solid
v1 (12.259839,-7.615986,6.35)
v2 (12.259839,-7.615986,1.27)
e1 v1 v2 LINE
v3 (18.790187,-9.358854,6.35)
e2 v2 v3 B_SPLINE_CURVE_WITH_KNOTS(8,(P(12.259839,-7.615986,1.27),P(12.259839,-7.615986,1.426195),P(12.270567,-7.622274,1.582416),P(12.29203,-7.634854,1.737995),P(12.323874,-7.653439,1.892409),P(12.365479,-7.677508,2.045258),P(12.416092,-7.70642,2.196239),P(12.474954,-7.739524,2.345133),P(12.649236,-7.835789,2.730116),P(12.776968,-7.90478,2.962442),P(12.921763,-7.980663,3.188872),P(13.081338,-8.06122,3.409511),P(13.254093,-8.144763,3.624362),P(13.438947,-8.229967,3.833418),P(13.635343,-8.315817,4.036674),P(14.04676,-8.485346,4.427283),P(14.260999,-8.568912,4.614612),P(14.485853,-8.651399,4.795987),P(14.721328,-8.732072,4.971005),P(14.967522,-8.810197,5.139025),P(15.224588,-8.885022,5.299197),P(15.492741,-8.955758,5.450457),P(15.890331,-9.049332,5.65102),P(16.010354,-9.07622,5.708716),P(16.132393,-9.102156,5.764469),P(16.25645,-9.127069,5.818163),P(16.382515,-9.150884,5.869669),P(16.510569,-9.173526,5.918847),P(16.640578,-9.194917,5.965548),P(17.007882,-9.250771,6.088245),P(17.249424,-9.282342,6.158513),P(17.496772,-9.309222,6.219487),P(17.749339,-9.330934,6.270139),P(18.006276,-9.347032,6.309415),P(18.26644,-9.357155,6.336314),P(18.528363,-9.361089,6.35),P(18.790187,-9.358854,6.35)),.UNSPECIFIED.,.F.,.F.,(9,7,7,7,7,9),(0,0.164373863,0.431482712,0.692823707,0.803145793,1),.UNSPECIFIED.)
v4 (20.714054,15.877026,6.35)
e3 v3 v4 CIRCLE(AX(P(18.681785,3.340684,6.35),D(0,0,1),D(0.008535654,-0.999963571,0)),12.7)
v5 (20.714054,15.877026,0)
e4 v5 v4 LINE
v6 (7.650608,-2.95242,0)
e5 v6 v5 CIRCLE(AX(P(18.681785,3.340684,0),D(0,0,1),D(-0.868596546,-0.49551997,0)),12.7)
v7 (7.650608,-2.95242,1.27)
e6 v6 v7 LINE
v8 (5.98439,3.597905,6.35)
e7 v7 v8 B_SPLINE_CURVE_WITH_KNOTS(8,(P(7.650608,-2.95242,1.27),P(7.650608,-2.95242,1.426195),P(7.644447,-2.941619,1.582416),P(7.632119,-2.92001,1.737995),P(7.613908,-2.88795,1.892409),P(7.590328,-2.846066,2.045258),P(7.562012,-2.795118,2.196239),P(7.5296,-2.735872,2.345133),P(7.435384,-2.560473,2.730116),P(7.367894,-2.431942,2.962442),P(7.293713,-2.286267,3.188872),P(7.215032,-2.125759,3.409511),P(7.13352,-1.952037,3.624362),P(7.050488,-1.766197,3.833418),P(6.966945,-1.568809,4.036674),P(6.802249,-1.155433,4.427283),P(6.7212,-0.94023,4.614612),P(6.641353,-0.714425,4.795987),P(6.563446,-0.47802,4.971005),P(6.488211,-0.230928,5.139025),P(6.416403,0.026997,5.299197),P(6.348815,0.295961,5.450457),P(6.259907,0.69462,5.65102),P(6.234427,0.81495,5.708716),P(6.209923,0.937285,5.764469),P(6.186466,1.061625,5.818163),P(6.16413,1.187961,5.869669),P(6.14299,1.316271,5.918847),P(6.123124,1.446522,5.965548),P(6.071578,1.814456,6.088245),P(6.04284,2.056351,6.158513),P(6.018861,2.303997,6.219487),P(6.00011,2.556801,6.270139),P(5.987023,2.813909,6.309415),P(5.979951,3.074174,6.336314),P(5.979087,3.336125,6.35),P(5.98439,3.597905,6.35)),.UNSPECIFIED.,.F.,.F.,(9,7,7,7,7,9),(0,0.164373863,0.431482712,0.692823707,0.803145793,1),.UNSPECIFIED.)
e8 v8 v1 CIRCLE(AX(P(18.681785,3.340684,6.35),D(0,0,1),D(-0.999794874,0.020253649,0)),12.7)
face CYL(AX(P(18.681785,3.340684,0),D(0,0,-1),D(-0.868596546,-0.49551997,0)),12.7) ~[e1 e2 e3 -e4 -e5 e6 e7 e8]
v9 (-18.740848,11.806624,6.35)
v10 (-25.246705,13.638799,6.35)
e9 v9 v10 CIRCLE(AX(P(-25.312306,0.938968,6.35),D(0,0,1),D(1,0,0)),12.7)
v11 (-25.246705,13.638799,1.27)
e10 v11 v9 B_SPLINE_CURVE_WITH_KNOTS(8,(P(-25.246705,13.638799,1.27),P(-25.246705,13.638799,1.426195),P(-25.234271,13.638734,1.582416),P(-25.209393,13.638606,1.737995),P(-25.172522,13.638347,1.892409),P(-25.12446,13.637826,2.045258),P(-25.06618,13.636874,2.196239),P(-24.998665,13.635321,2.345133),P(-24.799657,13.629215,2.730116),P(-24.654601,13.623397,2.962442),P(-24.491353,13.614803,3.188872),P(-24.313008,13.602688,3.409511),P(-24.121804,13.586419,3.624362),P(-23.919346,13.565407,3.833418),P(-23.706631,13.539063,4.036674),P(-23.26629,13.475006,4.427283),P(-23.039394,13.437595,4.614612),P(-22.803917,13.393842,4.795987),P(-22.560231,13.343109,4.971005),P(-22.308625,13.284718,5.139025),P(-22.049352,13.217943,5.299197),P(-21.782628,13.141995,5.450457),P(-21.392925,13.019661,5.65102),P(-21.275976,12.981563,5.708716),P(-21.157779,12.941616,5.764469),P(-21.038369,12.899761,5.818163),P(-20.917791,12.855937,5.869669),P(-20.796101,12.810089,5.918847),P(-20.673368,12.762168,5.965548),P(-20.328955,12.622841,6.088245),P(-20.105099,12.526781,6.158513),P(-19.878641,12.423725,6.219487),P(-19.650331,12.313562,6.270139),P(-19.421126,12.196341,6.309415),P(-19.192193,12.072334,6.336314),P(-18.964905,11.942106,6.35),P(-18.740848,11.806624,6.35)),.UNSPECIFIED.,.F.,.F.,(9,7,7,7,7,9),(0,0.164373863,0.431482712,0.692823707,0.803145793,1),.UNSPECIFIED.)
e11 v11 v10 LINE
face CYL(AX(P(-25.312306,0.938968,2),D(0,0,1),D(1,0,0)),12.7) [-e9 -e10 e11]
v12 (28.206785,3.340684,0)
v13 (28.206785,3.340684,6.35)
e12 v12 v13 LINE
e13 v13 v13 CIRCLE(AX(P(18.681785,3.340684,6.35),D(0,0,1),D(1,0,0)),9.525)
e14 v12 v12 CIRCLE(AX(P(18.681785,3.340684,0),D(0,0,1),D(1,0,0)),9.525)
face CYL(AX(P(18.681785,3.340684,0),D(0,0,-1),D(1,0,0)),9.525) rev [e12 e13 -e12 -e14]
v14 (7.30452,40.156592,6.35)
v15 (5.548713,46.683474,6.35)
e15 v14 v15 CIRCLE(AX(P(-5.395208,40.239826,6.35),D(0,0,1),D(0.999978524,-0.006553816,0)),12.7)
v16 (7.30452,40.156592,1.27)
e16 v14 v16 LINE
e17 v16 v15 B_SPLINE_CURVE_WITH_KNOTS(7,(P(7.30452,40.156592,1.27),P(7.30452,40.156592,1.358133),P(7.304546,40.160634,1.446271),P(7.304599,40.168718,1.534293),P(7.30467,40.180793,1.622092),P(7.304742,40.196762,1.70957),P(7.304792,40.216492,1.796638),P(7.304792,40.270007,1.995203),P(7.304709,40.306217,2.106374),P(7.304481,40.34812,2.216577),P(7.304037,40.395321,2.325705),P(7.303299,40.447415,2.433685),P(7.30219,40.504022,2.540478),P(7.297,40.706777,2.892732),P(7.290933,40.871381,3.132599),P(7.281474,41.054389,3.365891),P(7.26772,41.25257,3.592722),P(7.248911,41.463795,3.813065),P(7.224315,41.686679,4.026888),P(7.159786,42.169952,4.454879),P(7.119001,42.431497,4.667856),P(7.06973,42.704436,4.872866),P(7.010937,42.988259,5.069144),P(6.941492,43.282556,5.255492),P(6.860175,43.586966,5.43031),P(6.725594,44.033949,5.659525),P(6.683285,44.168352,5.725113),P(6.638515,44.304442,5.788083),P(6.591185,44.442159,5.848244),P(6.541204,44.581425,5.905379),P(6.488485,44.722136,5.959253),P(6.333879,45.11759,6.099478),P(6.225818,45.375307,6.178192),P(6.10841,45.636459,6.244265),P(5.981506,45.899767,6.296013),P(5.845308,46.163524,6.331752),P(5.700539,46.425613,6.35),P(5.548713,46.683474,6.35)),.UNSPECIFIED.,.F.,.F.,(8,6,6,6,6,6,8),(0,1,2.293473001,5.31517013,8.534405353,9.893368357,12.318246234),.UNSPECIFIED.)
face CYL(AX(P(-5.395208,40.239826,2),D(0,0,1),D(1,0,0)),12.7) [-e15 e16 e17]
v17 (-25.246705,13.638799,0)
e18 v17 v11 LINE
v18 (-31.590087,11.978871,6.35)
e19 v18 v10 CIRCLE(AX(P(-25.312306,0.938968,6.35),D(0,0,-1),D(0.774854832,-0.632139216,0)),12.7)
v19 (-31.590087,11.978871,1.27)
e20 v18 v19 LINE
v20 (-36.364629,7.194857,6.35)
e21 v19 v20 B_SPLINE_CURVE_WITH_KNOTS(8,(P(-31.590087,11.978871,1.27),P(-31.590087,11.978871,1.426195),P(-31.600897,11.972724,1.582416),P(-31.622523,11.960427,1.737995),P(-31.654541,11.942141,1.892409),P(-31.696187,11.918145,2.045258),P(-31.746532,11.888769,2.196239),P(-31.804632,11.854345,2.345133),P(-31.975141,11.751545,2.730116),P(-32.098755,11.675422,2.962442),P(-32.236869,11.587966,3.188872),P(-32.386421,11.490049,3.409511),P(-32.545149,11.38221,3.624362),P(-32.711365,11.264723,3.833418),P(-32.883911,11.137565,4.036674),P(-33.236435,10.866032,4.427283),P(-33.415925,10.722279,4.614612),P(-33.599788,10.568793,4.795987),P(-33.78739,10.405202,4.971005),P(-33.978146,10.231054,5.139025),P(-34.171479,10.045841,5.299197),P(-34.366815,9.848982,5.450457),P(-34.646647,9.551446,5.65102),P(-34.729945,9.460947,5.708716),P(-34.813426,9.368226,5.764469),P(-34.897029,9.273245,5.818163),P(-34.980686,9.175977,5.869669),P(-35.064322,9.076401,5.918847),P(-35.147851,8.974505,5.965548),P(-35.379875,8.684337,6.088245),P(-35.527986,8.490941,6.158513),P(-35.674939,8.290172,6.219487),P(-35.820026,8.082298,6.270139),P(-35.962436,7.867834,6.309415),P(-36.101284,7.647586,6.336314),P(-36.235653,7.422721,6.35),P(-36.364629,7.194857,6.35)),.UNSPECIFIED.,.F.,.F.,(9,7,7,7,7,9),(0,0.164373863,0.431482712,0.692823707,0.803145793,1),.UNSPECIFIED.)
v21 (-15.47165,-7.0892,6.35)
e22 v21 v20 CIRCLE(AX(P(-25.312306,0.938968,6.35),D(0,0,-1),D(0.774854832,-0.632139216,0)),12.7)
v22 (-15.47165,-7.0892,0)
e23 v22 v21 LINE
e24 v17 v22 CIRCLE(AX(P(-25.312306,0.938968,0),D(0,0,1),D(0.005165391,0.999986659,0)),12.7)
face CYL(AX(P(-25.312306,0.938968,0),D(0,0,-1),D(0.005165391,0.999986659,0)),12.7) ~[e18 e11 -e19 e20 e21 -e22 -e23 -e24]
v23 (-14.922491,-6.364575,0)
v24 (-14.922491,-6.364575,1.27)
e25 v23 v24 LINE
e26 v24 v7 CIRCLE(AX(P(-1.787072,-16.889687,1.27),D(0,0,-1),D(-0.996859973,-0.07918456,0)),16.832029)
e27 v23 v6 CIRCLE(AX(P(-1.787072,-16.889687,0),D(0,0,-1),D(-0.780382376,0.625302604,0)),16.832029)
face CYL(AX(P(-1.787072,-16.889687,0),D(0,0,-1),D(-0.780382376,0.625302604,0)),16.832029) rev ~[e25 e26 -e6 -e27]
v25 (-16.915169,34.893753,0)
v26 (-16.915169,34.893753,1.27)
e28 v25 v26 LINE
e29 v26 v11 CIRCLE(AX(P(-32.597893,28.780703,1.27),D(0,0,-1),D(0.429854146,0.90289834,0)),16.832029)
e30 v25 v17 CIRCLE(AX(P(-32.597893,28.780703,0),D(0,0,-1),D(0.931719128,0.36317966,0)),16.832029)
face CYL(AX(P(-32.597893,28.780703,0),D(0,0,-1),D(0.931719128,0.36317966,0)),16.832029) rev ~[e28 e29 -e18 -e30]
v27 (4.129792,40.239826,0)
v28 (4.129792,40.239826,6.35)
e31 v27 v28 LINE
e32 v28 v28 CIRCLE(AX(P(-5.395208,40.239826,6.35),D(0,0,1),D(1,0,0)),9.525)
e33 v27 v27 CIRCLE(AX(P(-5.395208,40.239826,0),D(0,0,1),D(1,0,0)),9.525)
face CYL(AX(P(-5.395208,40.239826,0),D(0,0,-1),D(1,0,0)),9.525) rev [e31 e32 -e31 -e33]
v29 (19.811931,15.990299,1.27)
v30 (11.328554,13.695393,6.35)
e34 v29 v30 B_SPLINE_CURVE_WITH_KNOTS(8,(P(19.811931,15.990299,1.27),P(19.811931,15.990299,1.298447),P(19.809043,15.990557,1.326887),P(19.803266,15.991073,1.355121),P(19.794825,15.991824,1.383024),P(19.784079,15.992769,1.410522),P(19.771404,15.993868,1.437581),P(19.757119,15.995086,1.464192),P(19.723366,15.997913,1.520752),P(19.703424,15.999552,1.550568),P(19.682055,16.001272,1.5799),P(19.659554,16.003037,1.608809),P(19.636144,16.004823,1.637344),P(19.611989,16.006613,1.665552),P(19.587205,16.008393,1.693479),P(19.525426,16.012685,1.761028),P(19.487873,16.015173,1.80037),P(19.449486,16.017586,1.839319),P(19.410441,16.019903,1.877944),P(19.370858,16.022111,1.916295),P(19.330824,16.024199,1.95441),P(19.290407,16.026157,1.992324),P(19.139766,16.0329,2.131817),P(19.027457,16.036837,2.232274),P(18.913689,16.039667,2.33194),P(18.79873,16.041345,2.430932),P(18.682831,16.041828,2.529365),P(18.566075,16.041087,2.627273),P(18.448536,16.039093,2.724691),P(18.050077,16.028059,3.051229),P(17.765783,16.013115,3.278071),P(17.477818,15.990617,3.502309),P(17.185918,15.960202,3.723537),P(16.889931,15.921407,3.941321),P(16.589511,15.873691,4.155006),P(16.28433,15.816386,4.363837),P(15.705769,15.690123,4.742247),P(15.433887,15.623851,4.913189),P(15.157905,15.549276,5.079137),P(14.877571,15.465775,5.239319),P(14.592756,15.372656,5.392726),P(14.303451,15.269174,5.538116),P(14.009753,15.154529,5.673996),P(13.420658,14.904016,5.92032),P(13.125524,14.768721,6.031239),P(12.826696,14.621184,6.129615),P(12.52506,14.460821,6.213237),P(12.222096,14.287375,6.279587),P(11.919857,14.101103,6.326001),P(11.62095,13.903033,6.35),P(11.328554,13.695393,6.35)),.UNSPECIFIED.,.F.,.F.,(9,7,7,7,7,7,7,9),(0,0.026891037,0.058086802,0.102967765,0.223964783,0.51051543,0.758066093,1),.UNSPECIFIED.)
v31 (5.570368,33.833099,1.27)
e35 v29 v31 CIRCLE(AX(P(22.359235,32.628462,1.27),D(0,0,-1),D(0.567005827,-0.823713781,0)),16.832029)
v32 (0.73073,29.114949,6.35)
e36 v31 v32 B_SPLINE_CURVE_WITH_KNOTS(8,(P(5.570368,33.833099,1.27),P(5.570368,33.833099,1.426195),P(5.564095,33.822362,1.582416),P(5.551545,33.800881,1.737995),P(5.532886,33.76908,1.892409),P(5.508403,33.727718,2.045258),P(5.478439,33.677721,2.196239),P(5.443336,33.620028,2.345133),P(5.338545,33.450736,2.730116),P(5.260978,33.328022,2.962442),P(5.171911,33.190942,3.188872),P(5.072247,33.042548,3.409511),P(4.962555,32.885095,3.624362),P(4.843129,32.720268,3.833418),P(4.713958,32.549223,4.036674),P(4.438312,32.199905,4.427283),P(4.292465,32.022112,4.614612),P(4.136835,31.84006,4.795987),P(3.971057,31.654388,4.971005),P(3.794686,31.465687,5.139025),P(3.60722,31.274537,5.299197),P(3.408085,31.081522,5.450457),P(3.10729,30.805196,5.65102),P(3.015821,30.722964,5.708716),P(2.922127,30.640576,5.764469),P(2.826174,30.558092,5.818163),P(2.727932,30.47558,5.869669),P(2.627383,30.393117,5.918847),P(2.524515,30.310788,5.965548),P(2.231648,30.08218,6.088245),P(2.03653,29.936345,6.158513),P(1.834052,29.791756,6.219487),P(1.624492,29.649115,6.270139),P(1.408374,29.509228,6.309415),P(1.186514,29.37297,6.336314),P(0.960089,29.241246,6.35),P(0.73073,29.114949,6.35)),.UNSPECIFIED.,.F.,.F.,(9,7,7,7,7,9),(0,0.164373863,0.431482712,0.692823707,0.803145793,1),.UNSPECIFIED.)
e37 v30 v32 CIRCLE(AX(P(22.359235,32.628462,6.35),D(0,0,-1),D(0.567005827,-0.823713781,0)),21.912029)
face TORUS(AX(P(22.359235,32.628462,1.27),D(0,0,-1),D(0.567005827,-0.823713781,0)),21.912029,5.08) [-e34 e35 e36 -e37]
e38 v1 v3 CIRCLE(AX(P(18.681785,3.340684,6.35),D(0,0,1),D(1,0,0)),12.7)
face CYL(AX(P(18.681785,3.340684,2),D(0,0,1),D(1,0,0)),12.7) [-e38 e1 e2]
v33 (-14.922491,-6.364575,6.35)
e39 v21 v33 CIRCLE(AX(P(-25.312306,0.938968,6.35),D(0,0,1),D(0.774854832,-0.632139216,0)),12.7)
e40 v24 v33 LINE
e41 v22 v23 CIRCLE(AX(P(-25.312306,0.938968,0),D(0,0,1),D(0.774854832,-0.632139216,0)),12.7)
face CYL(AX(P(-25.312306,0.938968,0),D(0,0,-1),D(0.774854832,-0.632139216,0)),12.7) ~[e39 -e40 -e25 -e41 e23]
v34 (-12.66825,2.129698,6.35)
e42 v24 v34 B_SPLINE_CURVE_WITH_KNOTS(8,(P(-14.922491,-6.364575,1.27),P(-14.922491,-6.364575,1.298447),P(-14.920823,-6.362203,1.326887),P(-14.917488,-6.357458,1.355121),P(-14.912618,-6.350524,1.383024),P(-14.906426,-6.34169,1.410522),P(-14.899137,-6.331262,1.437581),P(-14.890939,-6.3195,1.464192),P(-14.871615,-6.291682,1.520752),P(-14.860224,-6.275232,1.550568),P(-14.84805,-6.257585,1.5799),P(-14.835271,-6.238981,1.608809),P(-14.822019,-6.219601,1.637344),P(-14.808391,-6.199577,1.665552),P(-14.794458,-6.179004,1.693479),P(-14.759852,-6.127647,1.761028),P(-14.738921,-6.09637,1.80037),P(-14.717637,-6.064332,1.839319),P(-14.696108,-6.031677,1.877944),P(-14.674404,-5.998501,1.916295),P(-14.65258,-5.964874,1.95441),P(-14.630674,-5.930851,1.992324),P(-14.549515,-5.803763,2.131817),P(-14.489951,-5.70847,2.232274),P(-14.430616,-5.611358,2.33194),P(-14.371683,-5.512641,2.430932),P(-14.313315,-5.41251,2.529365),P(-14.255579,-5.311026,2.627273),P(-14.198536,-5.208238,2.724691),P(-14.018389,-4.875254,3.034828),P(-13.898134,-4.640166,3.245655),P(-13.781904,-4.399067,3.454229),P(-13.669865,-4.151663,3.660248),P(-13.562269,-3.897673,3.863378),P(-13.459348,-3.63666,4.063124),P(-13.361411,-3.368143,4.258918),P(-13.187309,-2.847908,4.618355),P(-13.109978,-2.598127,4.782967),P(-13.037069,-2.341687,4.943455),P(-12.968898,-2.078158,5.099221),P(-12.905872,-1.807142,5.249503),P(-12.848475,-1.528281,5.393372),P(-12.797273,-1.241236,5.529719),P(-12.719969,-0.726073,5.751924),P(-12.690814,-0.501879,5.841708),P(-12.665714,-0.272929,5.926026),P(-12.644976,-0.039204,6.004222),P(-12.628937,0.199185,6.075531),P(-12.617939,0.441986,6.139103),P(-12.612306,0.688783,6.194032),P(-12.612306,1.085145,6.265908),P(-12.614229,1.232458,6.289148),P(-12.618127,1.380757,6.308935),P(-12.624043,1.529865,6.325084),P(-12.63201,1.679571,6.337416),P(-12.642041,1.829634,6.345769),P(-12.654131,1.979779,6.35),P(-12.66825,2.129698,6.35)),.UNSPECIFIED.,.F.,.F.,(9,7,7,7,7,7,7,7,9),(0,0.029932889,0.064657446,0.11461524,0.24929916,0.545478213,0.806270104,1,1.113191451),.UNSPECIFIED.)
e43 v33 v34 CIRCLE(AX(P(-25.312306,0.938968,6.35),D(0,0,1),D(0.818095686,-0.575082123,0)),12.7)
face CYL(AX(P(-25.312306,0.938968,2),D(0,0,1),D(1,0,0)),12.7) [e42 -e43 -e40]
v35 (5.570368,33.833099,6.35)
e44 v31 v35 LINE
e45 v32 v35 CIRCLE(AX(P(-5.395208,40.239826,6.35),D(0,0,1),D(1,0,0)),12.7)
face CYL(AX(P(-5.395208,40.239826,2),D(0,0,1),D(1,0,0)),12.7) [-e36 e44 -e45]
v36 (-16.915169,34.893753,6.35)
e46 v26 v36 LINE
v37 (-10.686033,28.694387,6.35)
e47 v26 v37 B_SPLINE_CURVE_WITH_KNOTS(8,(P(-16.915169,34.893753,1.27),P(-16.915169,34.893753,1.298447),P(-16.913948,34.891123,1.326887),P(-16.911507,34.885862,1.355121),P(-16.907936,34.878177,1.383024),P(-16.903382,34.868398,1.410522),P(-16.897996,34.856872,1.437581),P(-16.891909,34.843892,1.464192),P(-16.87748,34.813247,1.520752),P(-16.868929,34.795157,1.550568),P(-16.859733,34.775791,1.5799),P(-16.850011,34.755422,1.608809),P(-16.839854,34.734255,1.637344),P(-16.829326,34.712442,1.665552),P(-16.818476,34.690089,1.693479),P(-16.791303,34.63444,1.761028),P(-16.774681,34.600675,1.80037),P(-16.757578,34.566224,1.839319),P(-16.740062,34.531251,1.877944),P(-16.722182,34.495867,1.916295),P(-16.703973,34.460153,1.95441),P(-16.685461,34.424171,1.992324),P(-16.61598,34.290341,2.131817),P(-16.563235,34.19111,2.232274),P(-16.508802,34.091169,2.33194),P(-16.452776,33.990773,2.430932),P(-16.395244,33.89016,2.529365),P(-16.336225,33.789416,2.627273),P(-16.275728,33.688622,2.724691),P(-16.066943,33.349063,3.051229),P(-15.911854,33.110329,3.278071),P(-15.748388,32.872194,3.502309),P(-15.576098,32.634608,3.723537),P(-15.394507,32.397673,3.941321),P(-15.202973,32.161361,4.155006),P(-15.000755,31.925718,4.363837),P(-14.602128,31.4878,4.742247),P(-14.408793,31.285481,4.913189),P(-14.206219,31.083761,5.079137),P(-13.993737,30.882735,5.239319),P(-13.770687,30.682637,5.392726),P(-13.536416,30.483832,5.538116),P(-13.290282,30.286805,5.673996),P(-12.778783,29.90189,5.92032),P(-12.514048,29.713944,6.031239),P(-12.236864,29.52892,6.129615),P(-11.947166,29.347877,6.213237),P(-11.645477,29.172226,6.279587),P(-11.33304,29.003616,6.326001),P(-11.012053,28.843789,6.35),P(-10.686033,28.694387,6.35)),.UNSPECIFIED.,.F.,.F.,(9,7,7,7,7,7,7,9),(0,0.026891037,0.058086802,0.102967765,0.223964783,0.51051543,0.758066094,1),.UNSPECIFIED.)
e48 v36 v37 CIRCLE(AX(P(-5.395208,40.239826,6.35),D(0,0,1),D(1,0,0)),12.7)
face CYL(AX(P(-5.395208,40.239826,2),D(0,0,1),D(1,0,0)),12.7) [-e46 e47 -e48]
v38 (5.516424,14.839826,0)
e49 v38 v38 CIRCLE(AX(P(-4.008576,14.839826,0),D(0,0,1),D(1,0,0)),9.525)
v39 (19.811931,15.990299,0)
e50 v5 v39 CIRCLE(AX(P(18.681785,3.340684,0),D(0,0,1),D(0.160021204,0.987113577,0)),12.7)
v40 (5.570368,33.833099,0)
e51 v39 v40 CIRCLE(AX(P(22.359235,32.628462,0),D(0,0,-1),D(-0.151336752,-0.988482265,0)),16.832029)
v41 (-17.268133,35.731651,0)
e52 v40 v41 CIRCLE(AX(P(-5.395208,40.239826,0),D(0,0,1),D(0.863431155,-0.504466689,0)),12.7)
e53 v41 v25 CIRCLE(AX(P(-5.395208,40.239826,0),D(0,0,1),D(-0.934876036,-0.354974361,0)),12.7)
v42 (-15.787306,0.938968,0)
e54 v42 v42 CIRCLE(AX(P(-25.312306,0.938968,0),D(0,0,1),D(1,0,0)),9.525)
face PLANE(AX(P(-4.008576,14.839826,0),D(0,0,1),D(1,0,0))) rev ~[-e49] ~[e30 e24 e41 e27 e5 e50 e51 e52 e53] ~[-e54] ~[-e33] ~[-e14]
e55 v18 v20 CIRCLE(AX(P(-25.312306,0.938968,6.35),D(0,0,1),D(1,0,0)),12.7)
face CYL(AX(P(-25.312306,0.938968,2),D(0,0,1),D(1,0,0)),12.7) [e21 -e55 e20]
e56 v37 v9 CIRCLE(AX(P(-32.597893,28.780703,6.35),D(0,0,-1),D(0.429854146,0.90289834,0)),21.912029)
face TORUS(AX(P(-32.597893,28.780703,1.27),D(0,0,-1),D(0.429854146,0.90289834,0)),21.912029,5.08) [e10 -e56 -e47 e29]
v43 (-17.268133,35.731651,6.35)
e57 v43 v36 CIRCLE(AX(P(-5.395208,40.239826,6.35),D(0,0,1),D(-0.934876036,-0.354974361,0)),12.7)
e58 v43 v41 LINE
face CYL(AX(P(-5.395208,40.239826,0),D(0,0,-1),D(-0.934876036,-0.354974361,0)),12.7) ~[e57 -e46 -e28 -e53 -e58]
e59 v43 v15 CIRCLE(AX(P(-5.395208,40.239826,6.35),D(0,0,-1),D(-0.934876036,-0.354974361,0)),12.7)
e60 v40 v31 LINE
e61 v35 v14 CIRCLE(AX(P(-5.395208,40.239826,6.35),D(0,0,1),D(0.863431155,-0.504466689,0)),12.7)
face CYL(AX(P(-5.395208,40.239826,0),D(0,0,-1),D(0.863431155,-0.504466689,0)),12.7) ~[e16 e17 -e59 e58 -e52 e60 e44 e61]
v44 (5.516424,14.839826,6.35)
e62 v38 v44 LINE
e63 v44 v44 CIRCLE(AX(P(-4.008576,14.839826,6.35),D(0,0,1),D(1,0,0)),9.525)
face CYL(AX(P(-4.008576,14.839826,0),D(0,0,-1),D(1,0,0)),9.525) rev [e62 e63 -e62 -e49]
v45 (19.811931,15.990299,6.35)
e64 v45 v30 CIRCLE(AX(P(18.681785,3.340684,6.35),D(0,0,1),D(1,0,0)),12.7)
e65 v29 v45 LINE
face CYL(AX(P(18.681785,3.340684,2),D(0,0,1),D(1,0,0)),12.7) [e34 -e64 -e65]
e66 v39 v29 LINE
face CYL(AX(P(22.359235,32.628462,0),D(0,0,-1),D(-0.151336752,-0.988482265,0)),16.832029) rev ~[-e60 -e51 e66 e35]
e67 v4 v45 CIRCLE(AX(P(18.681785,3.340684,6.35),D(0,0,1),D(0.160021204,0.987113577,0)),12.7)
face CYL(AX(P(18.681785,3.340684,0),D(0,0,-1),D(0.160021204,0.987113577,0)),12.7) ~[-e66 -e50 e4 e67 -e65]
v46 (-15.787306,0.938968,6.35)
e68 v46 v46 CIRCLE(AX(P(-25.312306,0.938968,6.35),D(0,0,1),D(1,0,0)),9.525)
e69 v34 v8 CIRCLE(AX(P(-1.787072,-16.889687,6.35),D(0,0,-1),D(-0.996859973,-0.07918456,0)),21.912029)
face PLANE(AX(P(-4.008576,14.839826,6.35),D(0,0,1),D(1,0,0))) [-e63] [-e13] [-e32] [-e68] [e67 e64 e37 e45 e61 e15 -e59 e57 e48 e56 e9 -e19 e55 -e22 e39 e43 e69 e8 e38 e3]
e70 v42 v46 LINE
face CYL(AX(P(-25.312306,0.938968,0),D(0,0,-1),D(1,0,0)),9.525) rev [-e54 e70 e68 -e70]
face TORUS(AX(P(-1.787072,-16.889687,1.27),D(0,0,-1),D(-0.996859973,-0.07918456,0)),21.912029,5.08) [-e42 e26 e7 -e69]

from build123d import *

# Parameters (mm, degrees)
F0_R         = 9.525
F1_DEPTH     = 6.35
F2_T4_ANGLE  = 171.8918539933
F2_S5_R      = 12.7
F2_T6_DEPTH  = 33
F2_S7_R      = 12.7
F2_T8_DEPTH  = 33
F2_T12_ANGLE = 171.8918539933
F2_S13_R     = 12.7
F2_T14_DEPTH = 34
F2_S15_R     = 12.7
F2_T16_DEPTH = 34
F2_T20_ANGLE = 171.8918539933
F2_S21_R     = 12.7
F2_T22_DEPTH = 33
F2_S23_R     = 12.7
F2_T24_DEPTH = 33


# Not quite as in the source:
# - a fillet or chamfer that OpenCascade refuses, or shapes differently, is made with other operations: its cross-section is extruded or revolved along the edge and cut away or added


with BuildPart() as f1:
    # F0 (on Top) → F1 (new body)
    with BuildSketch(Plane.XY):
        with BuildLine():
            ThreePointArc((-16.9151689036, 34.8937534074), (-16.926787396, 22.6379285555), (-25.2467054302, 13.6387985033))
            ThreePointArc((-25.2467054302, 13.6387985033), (-36.7990792752, -4.4780457484), (-15.4716495202, -7.0892001179))
            ThreePointArc((-15.4716495202, -7.0892001179), (-15.2019637006, -6.723178945), (-14.922490674, -6.3645750302))
            ThreePointArc((-14.922490674, -6.3645750302), (-4.3028257617, -0.2467245138), (7.6506084925, -2.9524198627))
            ThreePointArc((7.6506084925, -2.9524198627), (29.1164427734, -3.8986469606), (20.7140539132, 15.8770261894))
            ThreePointArc((20.7140539132, 15.8770261894), (20.2622273693, 15.9275703737), (19.8119307558, 15.9902991571))
            ThreePointArc((19.8119307558, 15.9902991571), (9.2038843359, 22.1282734926), (5.5703681159, 33.8330988937))
            ThreePointArc((5.5703681159, 33.8330988937), (-4.34309232, 52.8961702433), (-17.2681332147, 35.7316514628))
            ThreePointArc((-17.2681332147, 35.7316514628), (-17.0859924904, 35.3150861055), (-16.9151689036, 34.8937534074))
        make_face()
        with Locations((-25.31230589, 0.9389679304)):
            Circle(F0_R, mode=Mode.SUBTRACT)
        with Locations((-4.0085762739, 14.8398258448)):
            Circle(F0_R, mode=Mode.SUBTRACT)
        with Locations((18.6817846223, 3.3406837591)):
            Circle(F0_R, mode=Mode.SUBTRACT)
        with Locations((-5.3952075541, 40.2398258448)):
            Circle(F0_R, mode=Mode.SUBTRACT)
        with BuildLine():
            ThreePointArc((-14.922490674, -6.3645750302), (-15.2019637006, -6.723178945), (-15.4716495202, -7.0892001179))
            ThreePointArc((-15.4716495202, -7.0892001179), (-15.1905834316, -6.7318035089), (-14.922490674, -6.3645750302))
        make_face()
        with BuildLine():
            ThreePointArc((-17.2681332147, 35.7316514628), (-17.0991517164, 35.3095427854), (-16.9151689036, 34.8937534074))
            ThreePointArc((-16.9151689036, 34.8937534074), (-17.0859924904, 35.3150861055), (-17.2681332147, 35.7316514628))
        make_face()
        with BuildLine():
            ThreePointArc((19.8119307558, 15.9902991571), (20.2622273693, 15.9275703737), (20.7140539132, 15.8770261894))
            ThreePointArc((20.7140539132, 15.8770261894), (20.2640063262, 15.9417382578), (19.8119307558, 15.9902991571))
        make_face()
    extrude(amount=F1_DEPTH)

    # F2: fillet of radius 5.08 on 3 edges, made by hand


with BuildPart() as f2_tool2:
    # F2_s3 → F2_t4 (revolve)
    with BuildSketch(Plane(origin=(1.3219976545, -16.6427211425, 0), x_dir=(0, 0, 1), z_dir=(0.0791845597, -0.9968599729, 0))):
        with BuildLine():
            ThreePointArc((1.27, 19.9508919573), (4.8621024484, 21.4387895089), (6.35, 25.0308919573))
            Line((6.35, 25.0308919573), (6.35, 19.9508919573))
            Line((6.35, 19.9508919573), (1.27, 19.9508919573))
        make_face()
    revolve(axis=Axis((-1.7870715149, -16.8896868949, 6.35), (0, 0, -1)), revolution_arc=F2_T4_ANGLE)

    # F2_s5 → F2_t6 (cut, symmetric)
    with BuildSketch(Plane.XY.offset(2)):
        with Locations((-25.31230589, 0.9389679304)):
            Circle(F2_S5_R)
    extrude(amount=F2_T6_DEPTH, both=True, mode=Mode.SUBTRACT)

    # F2_s7 → F2_t8 (cut, symmetric)
    with BuildSketch(Plane.XY.offset(2)):
        with Locations((18.6817846223, 3.3406837591)):
            Circle(F2_S7_R)
    extrude(amount=F2_T8_DEPTH, both=True, mode=Mode.SUBTRACT)


with BuildPart() as f1_1:
    add(f1.part)

    # F2_t1: cut F2_tool2
    add(f2_tool2.part, mode=Mode.SUBTRACT)


with BuildPart() as f2_tool10:
    # F2_s11 → F2_t12 (revolve)
    with BuildSketch(Plane(origin=(30.4099792651, 20.9327995218, 0), x_dir=(0, 0, 1), z_dir=(0.8237137807, 0.5670058267, 0))):
        with BuildLine():
            ThreePointArc((1.27, 2.6333326422), (4.8621024484, 4.1212301938), (6.35, 7.7133326422))
            Line((6.35, 7.7133326422), (6.35, 2.6333326422))
            Line((6.35, 2.6333326422), (1.27, 2.6333326422))
        make_face()
    revolve(axis=Axis((22.3592354288, 32.6284617706, 6.35), (0, 0, -1)), revolution_arc=F2_T12_ANGLE)

    # F2_s13 → F2_t14 (cut, symmetric)
    with BuildSketch(Plane.XY.offset(2)):
        with Locations((18.6817846223, 3.3406837591)):
            Circle(F2_S13_R)
    extrude(amount=F2_T14_DEPTH, both=True, mode=Mode.SUBTRACT)

    # F2_s15 → F2_t16 (cut, symmetric)
    with BuildSketch(Plane.XY.offset(2)):
        with Locations((-5.3952075541, 40.2398258448)):
            Circle(F2_S15_R)
    extrude(amount=F2_T16_DEPTH, both=True, mode=Mode.SUBTRACT)


with BuildPart() as f1_2:
    add(f1_1.part)

    # F2_t9: cut F2_tool10
    add(f2_tool10.part, mode=Mode.SUBTRACT)


with BuildPart() as f2_tool18:
    # F2_s19 → F2_t20 (revolve)
    with BuildSketch(Plane(origin=(-37.7448413305, 17.9696603878, 0), x_dir=(0, 0, 1), z_dir=(-0.9028983404, 0.4298541461, 0))):
        with BuildLine():
            ThreePointArc((1.27, 28.8057387926), (4.8621024484, 30.2936363442), (6.35, 33.8857387926))
            Line((6.35, 33.8857387926), (6.35, 28.8057387926))
            Line((6.35, 28.8057387926), (1.27, 28.8057387926))
        make_face()
    revolve(axis=Axis((-32.5978927357, 28.7807026587, 6.35), (0, 0, -1)), revolution_arc=F2_T20_ANGLE)

    # F2_s21 → F2_t22 (cut, symmetric)
    with BuildSketch(Plane.XY.offset(2)):
        with Locations((-25.31230589, 0.9389679304)):
            Circle(F2_S21_R)
    extrude(amount=F2_T22_DEPTH, both=True, mode=Mode.SUBTRACT)

    # F2_s23 → F2_t24 (cut, symmetric)
    with BuildSketch(Plane.XY.offset(2)):
        with Locations((-5.3952075541, 40.2398258448)):
            Circle(F2_S23_R)
    extrude(amount=F2_T24_DEPTH, both=True, mode=Mode.SUBTRACT)


with BuildPart() as f1_3:
    add(f1_2.part)

    # F2_t17: cut F2_tool18
    add(f2_tool18.part, mode=Mode.SUBTRACT)


solid = f1_3.part
